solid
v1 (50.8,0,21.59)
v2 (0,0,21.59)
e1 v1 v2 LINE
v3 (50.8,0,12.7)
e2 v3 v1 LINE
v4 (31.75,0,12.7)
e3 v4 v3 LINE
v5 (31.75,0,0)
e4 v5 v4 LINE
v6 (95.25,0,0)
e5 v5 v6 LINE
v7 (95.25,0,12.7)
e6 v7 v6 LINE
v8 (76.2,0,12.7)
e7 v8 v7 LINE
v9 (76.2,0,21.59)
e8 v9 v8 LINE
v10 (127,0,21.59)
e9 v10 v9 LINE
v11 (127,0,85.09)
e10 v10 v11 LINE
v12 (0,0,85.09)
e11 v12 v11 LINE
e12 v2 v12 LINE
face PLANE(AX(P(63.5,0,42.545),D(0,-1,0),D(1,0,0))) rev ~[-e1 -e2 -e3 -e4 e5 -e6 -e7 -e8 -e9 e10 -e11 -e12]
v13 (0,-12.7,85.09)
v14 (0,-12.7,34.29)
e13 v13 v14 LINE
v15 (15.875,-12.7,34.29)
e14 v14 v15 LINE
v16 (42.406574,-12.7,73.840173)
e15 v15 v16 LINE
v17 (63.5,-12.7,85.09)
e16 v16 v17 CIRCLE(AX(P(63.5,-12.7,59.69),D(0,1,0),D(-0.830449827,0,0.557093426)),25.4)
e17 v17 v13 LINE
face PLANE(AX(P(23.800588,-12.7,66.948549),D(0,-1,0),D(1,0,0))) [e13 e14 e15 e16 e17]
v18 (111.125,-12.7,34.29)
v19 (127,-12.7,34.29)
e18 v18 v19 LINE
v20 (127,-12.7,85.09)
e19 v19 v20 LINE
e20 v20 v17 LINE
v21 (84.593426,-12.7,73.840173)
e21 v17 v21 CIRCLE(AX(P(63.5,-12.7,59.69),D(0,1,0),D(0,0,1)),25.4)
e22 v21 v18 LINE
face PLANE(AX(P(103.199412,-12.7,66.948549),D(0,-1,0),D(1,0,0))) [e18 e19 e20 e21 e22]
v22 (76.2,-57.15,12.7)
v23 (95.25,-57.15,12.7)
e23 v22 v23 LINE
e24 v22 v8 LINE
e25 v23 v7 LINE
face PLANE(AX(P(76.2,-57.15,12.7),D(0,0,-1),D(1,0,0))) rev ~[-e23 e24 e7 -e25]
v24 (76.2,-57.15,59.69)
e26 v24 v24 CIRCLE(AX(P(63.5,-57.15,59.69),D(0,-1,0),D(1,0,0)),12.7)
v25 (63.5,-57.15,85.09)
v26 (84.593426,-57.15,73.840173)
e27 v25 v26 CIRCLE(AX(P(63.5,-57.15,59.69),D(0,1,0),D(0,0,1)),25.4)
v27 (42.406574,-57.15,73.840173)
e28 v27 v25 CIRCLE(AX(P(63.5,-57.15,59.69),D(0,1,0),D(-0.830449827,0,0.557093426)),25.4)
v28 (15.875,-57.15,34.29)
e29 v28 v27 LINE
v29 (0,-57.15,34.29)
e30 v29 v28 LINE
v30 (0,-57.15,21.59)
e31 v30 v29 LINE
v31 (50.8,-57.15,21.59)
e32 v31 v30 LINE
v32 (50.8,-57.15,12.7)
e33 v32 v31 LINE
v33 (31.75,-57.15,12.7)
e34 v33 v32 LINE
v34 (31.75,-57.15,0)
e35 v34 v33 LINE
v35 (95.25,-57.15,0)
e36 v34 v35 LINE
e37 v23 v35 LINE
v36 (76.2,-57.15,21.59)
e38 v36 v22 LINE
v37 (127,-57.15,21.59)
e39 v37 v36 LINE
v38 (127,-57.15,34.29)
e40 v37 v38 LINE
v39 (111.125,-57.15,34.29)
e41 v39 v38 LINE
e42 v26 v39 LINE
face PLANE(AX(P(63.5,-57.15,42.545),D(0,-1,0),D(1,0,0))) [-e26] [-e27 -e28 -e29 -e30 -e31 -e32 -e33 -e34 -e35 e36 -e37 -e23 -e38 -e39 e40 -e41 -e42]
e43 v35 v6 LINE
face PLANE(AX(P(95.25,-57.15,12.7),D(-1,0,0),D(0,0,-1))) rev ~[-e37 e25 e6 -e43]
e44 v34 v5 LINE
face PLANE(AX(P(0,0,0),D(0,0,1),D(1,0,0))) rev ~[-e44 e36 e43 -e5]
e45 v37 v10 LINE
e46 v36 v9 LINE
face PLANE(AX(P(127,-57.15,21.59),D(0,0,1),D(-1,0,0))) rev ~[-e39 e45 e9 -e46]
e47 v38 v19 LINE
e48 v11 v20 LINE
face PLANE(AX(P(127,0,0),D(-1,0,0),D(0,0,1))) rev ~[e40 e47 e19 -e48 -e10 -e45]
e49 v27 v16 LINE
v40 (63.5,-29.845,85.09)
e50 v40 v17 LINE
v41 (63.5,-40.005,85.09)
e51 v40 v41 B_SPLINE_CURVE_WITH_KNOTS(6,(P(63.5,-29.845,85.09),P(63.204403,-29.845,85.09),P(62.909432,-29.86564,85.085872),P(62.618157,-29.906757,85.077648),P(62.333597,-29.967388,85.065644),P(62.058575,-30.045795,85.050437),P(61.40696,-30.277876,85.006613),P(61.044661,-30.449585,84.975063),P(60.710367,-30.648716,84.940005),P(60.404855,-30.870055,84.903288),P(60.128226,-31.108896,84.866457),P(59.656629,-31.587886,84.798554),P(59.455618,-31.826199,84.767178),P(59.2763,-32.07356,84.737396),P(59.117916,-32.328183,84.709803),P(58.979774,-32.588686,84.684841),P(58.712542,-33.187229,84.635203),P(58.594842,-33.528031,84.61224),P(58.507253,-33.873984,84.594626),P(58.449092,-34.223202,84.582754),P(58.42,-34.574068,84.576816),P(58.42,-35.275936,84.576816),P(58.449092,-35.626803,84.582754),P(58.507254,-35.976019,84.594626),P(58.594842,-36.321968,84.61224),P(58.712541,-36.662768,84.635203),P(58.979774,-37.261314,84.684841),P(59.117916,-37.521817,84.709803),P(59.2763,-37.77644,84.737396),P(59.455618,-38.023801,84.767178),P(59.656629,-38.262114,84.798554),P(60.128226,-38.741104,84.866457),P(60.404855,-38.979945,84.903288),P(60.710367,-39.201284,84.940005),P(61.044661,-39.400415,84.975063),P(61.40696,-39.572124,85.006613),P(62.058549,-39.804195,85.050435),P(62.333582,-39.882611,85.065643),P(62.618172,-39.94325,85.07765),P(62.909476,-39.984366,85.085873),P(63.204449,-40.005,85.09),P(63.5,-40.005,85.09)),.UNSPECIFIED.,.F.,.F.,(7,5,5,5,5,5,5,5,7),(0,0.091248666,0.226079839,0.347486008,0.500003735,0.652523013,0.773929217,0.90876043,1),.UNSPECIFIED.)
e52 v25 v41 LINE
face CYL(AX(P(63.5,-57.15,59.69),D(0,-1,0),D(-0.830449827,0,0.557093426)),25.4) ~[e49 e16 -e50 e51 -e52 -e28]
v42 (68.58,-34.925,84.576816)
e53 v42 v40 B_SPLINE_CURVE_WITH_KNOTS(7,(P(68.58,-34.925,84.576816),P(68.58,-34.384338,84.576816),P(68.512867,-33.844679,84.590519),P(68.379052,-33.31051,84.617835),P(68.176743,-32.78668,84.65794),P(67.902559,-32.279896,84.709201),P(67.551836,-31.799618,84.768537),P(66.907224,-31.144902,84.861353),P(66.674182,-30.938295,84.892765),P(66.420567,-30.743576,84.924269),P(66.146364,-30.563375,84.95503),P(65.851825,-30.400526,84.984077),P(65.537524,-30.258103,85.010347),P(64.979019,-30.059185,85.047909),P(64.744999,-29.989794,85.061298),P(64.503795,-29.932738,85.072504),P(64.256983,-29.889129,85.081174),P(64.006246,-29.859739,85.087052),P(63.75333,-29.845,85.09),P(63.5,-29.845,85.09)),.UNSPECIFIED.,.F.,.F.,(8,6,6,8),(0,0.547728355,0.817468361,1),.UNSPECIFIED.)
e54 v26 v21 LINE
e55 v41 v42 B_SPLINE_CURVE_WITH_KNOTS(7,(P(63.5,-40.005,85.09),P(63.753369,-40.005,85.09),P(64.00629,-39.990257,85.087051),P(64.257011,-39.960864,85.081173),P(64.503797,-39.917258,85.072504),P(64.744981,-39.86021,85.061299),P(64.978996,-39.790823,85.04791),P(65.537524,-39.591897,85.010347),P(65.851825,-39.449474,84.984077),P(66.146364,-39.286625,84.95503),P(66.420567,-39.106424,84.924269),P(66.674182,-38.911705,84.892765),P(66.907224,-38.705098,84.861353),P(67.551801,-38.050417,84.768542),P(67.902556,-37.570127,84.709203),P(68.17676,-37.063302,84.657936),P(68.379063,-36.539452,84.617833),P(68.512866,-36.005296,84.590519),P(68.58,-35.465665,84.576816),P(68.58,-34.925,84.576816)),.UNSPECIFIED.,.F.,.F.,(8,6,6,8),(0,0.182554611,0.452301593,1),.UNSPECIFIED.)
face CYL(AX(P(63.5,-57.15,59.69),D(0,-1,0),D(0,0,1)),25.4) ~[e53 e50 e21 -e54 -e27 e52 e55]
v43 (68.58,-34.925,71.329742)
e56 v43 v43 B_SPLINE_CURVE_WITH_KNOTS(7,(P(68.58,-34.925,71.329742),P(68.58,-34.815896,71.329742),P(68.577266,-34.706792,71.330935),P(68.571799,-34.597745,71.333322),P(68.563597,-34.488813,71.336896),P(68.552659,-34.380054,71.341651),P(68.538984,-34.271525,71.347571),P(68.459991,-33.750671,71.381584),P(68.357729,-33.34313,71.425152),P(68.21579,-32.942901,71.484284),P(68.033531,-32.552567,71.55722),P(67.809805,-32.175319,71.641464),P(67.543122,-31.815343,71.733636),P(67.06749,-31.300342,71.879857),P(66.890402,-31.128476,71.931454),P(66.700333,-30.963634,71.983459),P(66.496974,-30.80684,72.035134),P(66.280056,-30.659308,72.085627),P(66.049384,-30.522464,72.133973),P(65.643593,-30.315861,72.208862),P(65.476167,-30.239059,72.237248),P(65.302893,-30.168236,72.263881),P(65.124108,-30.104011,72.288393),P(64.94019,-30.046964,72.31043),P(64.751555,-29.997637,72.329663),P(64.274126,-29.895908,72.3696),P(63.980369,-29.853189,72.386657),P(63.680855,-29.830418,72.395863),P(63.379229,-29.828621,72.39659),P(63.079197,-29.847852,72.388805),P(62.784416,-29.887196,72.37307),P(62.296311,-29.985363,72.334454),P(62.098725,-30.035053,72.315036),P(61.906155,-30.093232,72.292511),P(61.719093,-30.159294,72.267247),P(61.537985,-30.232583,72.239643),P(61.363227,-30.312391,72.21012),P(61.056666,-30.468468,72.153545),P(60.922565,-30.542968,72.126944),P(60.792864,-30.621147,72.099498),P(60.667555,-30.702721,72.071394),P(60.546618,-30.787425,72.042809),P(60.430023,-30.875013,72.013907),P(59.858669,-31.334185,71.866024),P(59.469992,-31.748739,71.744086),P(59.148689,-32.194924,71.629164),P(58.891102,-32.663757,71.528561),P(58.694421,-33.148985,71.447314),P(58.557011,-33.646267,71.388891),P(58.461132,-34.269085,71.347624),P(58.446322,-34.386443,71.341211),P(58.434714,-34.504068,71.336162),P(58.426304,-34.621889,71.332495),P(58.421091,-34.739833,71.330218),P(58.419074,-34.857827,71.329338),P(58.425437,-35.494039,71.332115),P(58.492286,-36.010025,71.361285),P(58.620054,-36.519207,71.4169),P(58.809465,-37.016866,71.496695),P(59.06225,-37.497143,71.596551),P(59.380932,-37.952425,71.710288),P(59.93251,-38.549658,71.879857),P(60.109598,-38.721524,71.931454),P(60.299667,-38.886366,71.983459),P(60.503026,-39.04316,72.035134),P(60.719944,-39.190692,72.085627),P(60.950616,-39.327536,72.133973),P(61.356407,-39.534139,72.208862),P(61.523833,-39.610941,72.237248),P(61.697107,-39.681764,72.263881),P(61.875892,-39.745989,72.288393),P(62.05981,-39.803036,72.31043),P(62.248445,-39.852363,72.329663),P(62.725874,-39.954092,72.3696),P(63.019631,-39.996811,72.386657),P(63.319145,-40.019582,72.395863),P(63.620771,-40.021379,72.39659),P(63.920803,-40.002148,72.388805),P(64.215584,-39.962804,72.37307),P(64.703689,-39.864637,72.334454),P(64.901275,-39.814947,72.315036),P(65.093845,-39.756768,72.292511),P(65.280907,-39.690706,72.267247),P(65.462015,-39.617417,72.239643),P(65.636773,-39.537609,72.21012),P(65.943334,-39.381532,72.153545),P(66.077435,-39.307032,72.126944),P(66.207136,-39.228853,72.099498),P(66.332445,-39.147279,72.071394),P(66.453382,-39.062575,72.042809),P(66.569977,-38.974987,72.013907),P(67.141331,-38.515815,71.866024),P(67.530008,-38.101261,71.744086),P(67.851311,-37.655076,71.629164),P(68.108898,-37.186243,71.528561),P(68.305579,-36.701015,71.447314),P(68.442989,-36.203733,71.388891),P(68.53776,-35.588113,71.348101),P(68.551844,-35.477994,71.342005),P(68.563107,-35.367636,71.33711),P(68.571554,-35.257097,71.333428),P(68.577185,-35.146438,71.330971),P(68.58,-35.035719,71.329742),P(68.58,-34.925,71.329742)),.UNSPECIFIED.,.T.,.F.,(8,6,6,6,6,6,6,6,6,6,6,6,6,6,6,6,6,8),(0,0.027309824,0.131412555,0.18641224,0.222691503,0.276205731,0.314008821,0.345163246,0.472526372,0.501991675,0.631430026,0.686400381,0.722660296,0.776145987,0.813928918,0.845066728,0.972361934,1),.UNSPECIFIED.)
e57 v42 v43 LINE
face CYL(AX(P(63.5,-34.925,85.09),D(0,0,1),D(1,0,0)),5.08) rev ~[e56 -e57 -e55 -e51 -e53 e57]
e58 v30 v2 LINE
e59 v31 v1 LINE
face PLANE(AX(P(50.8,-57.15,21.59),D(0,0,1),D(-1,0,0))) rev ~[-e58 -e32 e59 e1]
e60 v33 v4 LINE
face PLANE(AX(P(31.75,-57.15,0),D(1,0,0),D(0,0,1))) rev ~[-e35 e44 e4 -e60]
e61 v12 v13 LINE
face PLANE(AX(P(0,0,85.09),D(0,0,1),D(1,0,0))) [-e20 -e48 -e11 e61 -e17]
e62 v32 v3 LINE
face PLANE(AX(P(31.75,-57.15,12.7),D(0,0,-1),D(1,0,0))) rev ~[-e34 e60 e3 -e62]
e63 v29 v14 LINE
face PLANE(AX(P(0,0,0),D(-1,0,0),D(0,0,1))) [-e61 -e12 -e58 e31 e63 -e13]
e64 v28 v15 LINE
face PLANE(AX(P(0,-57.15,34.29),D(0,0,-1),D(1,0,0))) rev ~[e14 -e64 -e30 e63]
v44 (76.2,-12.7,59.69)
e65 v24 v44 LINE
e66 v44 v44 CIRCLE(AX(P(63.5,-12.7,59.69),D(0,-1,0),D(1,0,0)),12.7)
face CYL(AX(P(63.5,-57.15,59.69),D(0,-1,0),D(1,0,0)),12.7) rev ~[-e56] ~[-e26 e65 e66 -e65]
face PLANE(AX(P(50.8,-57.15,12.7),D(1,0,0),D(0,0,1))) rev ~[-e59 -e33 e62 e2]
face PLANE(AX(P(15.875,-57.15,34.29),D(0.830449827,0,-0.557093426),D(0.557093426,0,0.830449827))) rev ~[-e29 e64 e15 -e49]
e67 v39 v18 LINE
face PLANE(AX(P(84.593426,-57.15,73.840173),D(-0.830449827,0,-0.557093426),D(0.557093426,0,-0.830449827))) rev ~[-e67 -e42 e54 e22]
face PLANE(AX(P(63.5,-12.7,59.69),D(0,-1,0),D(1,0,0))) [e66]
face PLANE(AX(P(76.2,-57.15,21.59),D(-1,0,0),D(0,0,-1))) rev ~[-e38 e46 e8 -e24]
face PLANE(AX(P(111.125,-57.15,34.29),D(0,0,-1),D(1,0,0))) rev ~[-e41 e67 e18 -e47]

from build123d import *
from build123d import SkipClean  # not in build123d's __all__

# Parameters (mm, degrees)
F0_W     = 127
F0_H     = 85.09
F1_DEPTH = 57.15
F3_DEPTH = 57.151
F4_R     = 12.7
F5_DEPTH = 44.45
F6_R     = 5.08
F7_REACH = 99.4594097937


with BuildPart() as f1:
    # F0 (on Front) → F1 (new body)
    with BuildSketch(Plane.XZ):
        with Locations((63.5, 42.545)):
            Rectangle(F0_W, F0_H)
    extrude(amount=F1_DEPTH)

    # F2 (on face) → F3 (cut, through all)
    with BuildSketch(Plane.XZ.offset(57.15)):
        Polygon((0, 0), (31.75, 0), (31.75, 12.7), (50.8, 12.7), (50.8, 21.59), (0, 21.59), align=None)
        Polygon((95.25, 12.7), (95.25, 0), (127, 0), (127, 21.59), (76.2, 21.59), (76.2, 12.7), align=None)
    extrude(amount=-F3_DEPTH, mode=Mode.SUBTRACT)

    # F4 (on face) → F5 (cut)
    with BuildSketch(Plane.XZ.offset(57.15)):
        with Locations((63.5, 59.69)):
            Circle(F4_R)
        with BuildLine():
            Line((0, 85.09), (0, 34.29))
            Line((0, 34.29), (15.875, 34.29))
            Line((15.875, 34.29), (42.4065743945, 73.8401730104))
            ThreePointArc((42.4065743945, 73.8401730104), (51.5470588235, 82.1017647059), (63.5, 85.09))
            Line((63.5, 85.09), (0, 85.09))
        make_face()
        with BuildLine():
            Line((127, 85.09), (63.5, 85.09))
            ThreePointArc((63.5, 85.09), (75.4529411765, 82.1017647059), (84.5934256055, 73.8401730104))
            Line((84.5934256055, 73.8401730104), (111.125, 34.29))
            Line((111.125, 34.29), (127, 34.29))
            Line((127, 34.29), (127, 85.09))
        make_face()
    extrude(amount=-F5_DEPTH, mode=Mode.SUBTRACT)

    f7_end = f1.faces().sort_by_distance((50.8, -34.925, 59.69))[0]
    # F6 (on face) → F7 (cut, up to a face of the model that its end follows)
    with BuildSketch(Plane.XY.offset(85.09)):
        with Locations((63.5, -34.925)):
            Circle(F6_R)
    f7_long = extrude(amount=-F7_REACH, mode=Mode.PRIVATE)
    add(split(f7_long, bisect_by=f7_end, keep=Keep.ALL, mode=Mode.PRIVATE).solids().sort_by_distance((63.5, -34.925, 85.09))[0], mode=Mode.SUBTRACT)


solid = f1.part
